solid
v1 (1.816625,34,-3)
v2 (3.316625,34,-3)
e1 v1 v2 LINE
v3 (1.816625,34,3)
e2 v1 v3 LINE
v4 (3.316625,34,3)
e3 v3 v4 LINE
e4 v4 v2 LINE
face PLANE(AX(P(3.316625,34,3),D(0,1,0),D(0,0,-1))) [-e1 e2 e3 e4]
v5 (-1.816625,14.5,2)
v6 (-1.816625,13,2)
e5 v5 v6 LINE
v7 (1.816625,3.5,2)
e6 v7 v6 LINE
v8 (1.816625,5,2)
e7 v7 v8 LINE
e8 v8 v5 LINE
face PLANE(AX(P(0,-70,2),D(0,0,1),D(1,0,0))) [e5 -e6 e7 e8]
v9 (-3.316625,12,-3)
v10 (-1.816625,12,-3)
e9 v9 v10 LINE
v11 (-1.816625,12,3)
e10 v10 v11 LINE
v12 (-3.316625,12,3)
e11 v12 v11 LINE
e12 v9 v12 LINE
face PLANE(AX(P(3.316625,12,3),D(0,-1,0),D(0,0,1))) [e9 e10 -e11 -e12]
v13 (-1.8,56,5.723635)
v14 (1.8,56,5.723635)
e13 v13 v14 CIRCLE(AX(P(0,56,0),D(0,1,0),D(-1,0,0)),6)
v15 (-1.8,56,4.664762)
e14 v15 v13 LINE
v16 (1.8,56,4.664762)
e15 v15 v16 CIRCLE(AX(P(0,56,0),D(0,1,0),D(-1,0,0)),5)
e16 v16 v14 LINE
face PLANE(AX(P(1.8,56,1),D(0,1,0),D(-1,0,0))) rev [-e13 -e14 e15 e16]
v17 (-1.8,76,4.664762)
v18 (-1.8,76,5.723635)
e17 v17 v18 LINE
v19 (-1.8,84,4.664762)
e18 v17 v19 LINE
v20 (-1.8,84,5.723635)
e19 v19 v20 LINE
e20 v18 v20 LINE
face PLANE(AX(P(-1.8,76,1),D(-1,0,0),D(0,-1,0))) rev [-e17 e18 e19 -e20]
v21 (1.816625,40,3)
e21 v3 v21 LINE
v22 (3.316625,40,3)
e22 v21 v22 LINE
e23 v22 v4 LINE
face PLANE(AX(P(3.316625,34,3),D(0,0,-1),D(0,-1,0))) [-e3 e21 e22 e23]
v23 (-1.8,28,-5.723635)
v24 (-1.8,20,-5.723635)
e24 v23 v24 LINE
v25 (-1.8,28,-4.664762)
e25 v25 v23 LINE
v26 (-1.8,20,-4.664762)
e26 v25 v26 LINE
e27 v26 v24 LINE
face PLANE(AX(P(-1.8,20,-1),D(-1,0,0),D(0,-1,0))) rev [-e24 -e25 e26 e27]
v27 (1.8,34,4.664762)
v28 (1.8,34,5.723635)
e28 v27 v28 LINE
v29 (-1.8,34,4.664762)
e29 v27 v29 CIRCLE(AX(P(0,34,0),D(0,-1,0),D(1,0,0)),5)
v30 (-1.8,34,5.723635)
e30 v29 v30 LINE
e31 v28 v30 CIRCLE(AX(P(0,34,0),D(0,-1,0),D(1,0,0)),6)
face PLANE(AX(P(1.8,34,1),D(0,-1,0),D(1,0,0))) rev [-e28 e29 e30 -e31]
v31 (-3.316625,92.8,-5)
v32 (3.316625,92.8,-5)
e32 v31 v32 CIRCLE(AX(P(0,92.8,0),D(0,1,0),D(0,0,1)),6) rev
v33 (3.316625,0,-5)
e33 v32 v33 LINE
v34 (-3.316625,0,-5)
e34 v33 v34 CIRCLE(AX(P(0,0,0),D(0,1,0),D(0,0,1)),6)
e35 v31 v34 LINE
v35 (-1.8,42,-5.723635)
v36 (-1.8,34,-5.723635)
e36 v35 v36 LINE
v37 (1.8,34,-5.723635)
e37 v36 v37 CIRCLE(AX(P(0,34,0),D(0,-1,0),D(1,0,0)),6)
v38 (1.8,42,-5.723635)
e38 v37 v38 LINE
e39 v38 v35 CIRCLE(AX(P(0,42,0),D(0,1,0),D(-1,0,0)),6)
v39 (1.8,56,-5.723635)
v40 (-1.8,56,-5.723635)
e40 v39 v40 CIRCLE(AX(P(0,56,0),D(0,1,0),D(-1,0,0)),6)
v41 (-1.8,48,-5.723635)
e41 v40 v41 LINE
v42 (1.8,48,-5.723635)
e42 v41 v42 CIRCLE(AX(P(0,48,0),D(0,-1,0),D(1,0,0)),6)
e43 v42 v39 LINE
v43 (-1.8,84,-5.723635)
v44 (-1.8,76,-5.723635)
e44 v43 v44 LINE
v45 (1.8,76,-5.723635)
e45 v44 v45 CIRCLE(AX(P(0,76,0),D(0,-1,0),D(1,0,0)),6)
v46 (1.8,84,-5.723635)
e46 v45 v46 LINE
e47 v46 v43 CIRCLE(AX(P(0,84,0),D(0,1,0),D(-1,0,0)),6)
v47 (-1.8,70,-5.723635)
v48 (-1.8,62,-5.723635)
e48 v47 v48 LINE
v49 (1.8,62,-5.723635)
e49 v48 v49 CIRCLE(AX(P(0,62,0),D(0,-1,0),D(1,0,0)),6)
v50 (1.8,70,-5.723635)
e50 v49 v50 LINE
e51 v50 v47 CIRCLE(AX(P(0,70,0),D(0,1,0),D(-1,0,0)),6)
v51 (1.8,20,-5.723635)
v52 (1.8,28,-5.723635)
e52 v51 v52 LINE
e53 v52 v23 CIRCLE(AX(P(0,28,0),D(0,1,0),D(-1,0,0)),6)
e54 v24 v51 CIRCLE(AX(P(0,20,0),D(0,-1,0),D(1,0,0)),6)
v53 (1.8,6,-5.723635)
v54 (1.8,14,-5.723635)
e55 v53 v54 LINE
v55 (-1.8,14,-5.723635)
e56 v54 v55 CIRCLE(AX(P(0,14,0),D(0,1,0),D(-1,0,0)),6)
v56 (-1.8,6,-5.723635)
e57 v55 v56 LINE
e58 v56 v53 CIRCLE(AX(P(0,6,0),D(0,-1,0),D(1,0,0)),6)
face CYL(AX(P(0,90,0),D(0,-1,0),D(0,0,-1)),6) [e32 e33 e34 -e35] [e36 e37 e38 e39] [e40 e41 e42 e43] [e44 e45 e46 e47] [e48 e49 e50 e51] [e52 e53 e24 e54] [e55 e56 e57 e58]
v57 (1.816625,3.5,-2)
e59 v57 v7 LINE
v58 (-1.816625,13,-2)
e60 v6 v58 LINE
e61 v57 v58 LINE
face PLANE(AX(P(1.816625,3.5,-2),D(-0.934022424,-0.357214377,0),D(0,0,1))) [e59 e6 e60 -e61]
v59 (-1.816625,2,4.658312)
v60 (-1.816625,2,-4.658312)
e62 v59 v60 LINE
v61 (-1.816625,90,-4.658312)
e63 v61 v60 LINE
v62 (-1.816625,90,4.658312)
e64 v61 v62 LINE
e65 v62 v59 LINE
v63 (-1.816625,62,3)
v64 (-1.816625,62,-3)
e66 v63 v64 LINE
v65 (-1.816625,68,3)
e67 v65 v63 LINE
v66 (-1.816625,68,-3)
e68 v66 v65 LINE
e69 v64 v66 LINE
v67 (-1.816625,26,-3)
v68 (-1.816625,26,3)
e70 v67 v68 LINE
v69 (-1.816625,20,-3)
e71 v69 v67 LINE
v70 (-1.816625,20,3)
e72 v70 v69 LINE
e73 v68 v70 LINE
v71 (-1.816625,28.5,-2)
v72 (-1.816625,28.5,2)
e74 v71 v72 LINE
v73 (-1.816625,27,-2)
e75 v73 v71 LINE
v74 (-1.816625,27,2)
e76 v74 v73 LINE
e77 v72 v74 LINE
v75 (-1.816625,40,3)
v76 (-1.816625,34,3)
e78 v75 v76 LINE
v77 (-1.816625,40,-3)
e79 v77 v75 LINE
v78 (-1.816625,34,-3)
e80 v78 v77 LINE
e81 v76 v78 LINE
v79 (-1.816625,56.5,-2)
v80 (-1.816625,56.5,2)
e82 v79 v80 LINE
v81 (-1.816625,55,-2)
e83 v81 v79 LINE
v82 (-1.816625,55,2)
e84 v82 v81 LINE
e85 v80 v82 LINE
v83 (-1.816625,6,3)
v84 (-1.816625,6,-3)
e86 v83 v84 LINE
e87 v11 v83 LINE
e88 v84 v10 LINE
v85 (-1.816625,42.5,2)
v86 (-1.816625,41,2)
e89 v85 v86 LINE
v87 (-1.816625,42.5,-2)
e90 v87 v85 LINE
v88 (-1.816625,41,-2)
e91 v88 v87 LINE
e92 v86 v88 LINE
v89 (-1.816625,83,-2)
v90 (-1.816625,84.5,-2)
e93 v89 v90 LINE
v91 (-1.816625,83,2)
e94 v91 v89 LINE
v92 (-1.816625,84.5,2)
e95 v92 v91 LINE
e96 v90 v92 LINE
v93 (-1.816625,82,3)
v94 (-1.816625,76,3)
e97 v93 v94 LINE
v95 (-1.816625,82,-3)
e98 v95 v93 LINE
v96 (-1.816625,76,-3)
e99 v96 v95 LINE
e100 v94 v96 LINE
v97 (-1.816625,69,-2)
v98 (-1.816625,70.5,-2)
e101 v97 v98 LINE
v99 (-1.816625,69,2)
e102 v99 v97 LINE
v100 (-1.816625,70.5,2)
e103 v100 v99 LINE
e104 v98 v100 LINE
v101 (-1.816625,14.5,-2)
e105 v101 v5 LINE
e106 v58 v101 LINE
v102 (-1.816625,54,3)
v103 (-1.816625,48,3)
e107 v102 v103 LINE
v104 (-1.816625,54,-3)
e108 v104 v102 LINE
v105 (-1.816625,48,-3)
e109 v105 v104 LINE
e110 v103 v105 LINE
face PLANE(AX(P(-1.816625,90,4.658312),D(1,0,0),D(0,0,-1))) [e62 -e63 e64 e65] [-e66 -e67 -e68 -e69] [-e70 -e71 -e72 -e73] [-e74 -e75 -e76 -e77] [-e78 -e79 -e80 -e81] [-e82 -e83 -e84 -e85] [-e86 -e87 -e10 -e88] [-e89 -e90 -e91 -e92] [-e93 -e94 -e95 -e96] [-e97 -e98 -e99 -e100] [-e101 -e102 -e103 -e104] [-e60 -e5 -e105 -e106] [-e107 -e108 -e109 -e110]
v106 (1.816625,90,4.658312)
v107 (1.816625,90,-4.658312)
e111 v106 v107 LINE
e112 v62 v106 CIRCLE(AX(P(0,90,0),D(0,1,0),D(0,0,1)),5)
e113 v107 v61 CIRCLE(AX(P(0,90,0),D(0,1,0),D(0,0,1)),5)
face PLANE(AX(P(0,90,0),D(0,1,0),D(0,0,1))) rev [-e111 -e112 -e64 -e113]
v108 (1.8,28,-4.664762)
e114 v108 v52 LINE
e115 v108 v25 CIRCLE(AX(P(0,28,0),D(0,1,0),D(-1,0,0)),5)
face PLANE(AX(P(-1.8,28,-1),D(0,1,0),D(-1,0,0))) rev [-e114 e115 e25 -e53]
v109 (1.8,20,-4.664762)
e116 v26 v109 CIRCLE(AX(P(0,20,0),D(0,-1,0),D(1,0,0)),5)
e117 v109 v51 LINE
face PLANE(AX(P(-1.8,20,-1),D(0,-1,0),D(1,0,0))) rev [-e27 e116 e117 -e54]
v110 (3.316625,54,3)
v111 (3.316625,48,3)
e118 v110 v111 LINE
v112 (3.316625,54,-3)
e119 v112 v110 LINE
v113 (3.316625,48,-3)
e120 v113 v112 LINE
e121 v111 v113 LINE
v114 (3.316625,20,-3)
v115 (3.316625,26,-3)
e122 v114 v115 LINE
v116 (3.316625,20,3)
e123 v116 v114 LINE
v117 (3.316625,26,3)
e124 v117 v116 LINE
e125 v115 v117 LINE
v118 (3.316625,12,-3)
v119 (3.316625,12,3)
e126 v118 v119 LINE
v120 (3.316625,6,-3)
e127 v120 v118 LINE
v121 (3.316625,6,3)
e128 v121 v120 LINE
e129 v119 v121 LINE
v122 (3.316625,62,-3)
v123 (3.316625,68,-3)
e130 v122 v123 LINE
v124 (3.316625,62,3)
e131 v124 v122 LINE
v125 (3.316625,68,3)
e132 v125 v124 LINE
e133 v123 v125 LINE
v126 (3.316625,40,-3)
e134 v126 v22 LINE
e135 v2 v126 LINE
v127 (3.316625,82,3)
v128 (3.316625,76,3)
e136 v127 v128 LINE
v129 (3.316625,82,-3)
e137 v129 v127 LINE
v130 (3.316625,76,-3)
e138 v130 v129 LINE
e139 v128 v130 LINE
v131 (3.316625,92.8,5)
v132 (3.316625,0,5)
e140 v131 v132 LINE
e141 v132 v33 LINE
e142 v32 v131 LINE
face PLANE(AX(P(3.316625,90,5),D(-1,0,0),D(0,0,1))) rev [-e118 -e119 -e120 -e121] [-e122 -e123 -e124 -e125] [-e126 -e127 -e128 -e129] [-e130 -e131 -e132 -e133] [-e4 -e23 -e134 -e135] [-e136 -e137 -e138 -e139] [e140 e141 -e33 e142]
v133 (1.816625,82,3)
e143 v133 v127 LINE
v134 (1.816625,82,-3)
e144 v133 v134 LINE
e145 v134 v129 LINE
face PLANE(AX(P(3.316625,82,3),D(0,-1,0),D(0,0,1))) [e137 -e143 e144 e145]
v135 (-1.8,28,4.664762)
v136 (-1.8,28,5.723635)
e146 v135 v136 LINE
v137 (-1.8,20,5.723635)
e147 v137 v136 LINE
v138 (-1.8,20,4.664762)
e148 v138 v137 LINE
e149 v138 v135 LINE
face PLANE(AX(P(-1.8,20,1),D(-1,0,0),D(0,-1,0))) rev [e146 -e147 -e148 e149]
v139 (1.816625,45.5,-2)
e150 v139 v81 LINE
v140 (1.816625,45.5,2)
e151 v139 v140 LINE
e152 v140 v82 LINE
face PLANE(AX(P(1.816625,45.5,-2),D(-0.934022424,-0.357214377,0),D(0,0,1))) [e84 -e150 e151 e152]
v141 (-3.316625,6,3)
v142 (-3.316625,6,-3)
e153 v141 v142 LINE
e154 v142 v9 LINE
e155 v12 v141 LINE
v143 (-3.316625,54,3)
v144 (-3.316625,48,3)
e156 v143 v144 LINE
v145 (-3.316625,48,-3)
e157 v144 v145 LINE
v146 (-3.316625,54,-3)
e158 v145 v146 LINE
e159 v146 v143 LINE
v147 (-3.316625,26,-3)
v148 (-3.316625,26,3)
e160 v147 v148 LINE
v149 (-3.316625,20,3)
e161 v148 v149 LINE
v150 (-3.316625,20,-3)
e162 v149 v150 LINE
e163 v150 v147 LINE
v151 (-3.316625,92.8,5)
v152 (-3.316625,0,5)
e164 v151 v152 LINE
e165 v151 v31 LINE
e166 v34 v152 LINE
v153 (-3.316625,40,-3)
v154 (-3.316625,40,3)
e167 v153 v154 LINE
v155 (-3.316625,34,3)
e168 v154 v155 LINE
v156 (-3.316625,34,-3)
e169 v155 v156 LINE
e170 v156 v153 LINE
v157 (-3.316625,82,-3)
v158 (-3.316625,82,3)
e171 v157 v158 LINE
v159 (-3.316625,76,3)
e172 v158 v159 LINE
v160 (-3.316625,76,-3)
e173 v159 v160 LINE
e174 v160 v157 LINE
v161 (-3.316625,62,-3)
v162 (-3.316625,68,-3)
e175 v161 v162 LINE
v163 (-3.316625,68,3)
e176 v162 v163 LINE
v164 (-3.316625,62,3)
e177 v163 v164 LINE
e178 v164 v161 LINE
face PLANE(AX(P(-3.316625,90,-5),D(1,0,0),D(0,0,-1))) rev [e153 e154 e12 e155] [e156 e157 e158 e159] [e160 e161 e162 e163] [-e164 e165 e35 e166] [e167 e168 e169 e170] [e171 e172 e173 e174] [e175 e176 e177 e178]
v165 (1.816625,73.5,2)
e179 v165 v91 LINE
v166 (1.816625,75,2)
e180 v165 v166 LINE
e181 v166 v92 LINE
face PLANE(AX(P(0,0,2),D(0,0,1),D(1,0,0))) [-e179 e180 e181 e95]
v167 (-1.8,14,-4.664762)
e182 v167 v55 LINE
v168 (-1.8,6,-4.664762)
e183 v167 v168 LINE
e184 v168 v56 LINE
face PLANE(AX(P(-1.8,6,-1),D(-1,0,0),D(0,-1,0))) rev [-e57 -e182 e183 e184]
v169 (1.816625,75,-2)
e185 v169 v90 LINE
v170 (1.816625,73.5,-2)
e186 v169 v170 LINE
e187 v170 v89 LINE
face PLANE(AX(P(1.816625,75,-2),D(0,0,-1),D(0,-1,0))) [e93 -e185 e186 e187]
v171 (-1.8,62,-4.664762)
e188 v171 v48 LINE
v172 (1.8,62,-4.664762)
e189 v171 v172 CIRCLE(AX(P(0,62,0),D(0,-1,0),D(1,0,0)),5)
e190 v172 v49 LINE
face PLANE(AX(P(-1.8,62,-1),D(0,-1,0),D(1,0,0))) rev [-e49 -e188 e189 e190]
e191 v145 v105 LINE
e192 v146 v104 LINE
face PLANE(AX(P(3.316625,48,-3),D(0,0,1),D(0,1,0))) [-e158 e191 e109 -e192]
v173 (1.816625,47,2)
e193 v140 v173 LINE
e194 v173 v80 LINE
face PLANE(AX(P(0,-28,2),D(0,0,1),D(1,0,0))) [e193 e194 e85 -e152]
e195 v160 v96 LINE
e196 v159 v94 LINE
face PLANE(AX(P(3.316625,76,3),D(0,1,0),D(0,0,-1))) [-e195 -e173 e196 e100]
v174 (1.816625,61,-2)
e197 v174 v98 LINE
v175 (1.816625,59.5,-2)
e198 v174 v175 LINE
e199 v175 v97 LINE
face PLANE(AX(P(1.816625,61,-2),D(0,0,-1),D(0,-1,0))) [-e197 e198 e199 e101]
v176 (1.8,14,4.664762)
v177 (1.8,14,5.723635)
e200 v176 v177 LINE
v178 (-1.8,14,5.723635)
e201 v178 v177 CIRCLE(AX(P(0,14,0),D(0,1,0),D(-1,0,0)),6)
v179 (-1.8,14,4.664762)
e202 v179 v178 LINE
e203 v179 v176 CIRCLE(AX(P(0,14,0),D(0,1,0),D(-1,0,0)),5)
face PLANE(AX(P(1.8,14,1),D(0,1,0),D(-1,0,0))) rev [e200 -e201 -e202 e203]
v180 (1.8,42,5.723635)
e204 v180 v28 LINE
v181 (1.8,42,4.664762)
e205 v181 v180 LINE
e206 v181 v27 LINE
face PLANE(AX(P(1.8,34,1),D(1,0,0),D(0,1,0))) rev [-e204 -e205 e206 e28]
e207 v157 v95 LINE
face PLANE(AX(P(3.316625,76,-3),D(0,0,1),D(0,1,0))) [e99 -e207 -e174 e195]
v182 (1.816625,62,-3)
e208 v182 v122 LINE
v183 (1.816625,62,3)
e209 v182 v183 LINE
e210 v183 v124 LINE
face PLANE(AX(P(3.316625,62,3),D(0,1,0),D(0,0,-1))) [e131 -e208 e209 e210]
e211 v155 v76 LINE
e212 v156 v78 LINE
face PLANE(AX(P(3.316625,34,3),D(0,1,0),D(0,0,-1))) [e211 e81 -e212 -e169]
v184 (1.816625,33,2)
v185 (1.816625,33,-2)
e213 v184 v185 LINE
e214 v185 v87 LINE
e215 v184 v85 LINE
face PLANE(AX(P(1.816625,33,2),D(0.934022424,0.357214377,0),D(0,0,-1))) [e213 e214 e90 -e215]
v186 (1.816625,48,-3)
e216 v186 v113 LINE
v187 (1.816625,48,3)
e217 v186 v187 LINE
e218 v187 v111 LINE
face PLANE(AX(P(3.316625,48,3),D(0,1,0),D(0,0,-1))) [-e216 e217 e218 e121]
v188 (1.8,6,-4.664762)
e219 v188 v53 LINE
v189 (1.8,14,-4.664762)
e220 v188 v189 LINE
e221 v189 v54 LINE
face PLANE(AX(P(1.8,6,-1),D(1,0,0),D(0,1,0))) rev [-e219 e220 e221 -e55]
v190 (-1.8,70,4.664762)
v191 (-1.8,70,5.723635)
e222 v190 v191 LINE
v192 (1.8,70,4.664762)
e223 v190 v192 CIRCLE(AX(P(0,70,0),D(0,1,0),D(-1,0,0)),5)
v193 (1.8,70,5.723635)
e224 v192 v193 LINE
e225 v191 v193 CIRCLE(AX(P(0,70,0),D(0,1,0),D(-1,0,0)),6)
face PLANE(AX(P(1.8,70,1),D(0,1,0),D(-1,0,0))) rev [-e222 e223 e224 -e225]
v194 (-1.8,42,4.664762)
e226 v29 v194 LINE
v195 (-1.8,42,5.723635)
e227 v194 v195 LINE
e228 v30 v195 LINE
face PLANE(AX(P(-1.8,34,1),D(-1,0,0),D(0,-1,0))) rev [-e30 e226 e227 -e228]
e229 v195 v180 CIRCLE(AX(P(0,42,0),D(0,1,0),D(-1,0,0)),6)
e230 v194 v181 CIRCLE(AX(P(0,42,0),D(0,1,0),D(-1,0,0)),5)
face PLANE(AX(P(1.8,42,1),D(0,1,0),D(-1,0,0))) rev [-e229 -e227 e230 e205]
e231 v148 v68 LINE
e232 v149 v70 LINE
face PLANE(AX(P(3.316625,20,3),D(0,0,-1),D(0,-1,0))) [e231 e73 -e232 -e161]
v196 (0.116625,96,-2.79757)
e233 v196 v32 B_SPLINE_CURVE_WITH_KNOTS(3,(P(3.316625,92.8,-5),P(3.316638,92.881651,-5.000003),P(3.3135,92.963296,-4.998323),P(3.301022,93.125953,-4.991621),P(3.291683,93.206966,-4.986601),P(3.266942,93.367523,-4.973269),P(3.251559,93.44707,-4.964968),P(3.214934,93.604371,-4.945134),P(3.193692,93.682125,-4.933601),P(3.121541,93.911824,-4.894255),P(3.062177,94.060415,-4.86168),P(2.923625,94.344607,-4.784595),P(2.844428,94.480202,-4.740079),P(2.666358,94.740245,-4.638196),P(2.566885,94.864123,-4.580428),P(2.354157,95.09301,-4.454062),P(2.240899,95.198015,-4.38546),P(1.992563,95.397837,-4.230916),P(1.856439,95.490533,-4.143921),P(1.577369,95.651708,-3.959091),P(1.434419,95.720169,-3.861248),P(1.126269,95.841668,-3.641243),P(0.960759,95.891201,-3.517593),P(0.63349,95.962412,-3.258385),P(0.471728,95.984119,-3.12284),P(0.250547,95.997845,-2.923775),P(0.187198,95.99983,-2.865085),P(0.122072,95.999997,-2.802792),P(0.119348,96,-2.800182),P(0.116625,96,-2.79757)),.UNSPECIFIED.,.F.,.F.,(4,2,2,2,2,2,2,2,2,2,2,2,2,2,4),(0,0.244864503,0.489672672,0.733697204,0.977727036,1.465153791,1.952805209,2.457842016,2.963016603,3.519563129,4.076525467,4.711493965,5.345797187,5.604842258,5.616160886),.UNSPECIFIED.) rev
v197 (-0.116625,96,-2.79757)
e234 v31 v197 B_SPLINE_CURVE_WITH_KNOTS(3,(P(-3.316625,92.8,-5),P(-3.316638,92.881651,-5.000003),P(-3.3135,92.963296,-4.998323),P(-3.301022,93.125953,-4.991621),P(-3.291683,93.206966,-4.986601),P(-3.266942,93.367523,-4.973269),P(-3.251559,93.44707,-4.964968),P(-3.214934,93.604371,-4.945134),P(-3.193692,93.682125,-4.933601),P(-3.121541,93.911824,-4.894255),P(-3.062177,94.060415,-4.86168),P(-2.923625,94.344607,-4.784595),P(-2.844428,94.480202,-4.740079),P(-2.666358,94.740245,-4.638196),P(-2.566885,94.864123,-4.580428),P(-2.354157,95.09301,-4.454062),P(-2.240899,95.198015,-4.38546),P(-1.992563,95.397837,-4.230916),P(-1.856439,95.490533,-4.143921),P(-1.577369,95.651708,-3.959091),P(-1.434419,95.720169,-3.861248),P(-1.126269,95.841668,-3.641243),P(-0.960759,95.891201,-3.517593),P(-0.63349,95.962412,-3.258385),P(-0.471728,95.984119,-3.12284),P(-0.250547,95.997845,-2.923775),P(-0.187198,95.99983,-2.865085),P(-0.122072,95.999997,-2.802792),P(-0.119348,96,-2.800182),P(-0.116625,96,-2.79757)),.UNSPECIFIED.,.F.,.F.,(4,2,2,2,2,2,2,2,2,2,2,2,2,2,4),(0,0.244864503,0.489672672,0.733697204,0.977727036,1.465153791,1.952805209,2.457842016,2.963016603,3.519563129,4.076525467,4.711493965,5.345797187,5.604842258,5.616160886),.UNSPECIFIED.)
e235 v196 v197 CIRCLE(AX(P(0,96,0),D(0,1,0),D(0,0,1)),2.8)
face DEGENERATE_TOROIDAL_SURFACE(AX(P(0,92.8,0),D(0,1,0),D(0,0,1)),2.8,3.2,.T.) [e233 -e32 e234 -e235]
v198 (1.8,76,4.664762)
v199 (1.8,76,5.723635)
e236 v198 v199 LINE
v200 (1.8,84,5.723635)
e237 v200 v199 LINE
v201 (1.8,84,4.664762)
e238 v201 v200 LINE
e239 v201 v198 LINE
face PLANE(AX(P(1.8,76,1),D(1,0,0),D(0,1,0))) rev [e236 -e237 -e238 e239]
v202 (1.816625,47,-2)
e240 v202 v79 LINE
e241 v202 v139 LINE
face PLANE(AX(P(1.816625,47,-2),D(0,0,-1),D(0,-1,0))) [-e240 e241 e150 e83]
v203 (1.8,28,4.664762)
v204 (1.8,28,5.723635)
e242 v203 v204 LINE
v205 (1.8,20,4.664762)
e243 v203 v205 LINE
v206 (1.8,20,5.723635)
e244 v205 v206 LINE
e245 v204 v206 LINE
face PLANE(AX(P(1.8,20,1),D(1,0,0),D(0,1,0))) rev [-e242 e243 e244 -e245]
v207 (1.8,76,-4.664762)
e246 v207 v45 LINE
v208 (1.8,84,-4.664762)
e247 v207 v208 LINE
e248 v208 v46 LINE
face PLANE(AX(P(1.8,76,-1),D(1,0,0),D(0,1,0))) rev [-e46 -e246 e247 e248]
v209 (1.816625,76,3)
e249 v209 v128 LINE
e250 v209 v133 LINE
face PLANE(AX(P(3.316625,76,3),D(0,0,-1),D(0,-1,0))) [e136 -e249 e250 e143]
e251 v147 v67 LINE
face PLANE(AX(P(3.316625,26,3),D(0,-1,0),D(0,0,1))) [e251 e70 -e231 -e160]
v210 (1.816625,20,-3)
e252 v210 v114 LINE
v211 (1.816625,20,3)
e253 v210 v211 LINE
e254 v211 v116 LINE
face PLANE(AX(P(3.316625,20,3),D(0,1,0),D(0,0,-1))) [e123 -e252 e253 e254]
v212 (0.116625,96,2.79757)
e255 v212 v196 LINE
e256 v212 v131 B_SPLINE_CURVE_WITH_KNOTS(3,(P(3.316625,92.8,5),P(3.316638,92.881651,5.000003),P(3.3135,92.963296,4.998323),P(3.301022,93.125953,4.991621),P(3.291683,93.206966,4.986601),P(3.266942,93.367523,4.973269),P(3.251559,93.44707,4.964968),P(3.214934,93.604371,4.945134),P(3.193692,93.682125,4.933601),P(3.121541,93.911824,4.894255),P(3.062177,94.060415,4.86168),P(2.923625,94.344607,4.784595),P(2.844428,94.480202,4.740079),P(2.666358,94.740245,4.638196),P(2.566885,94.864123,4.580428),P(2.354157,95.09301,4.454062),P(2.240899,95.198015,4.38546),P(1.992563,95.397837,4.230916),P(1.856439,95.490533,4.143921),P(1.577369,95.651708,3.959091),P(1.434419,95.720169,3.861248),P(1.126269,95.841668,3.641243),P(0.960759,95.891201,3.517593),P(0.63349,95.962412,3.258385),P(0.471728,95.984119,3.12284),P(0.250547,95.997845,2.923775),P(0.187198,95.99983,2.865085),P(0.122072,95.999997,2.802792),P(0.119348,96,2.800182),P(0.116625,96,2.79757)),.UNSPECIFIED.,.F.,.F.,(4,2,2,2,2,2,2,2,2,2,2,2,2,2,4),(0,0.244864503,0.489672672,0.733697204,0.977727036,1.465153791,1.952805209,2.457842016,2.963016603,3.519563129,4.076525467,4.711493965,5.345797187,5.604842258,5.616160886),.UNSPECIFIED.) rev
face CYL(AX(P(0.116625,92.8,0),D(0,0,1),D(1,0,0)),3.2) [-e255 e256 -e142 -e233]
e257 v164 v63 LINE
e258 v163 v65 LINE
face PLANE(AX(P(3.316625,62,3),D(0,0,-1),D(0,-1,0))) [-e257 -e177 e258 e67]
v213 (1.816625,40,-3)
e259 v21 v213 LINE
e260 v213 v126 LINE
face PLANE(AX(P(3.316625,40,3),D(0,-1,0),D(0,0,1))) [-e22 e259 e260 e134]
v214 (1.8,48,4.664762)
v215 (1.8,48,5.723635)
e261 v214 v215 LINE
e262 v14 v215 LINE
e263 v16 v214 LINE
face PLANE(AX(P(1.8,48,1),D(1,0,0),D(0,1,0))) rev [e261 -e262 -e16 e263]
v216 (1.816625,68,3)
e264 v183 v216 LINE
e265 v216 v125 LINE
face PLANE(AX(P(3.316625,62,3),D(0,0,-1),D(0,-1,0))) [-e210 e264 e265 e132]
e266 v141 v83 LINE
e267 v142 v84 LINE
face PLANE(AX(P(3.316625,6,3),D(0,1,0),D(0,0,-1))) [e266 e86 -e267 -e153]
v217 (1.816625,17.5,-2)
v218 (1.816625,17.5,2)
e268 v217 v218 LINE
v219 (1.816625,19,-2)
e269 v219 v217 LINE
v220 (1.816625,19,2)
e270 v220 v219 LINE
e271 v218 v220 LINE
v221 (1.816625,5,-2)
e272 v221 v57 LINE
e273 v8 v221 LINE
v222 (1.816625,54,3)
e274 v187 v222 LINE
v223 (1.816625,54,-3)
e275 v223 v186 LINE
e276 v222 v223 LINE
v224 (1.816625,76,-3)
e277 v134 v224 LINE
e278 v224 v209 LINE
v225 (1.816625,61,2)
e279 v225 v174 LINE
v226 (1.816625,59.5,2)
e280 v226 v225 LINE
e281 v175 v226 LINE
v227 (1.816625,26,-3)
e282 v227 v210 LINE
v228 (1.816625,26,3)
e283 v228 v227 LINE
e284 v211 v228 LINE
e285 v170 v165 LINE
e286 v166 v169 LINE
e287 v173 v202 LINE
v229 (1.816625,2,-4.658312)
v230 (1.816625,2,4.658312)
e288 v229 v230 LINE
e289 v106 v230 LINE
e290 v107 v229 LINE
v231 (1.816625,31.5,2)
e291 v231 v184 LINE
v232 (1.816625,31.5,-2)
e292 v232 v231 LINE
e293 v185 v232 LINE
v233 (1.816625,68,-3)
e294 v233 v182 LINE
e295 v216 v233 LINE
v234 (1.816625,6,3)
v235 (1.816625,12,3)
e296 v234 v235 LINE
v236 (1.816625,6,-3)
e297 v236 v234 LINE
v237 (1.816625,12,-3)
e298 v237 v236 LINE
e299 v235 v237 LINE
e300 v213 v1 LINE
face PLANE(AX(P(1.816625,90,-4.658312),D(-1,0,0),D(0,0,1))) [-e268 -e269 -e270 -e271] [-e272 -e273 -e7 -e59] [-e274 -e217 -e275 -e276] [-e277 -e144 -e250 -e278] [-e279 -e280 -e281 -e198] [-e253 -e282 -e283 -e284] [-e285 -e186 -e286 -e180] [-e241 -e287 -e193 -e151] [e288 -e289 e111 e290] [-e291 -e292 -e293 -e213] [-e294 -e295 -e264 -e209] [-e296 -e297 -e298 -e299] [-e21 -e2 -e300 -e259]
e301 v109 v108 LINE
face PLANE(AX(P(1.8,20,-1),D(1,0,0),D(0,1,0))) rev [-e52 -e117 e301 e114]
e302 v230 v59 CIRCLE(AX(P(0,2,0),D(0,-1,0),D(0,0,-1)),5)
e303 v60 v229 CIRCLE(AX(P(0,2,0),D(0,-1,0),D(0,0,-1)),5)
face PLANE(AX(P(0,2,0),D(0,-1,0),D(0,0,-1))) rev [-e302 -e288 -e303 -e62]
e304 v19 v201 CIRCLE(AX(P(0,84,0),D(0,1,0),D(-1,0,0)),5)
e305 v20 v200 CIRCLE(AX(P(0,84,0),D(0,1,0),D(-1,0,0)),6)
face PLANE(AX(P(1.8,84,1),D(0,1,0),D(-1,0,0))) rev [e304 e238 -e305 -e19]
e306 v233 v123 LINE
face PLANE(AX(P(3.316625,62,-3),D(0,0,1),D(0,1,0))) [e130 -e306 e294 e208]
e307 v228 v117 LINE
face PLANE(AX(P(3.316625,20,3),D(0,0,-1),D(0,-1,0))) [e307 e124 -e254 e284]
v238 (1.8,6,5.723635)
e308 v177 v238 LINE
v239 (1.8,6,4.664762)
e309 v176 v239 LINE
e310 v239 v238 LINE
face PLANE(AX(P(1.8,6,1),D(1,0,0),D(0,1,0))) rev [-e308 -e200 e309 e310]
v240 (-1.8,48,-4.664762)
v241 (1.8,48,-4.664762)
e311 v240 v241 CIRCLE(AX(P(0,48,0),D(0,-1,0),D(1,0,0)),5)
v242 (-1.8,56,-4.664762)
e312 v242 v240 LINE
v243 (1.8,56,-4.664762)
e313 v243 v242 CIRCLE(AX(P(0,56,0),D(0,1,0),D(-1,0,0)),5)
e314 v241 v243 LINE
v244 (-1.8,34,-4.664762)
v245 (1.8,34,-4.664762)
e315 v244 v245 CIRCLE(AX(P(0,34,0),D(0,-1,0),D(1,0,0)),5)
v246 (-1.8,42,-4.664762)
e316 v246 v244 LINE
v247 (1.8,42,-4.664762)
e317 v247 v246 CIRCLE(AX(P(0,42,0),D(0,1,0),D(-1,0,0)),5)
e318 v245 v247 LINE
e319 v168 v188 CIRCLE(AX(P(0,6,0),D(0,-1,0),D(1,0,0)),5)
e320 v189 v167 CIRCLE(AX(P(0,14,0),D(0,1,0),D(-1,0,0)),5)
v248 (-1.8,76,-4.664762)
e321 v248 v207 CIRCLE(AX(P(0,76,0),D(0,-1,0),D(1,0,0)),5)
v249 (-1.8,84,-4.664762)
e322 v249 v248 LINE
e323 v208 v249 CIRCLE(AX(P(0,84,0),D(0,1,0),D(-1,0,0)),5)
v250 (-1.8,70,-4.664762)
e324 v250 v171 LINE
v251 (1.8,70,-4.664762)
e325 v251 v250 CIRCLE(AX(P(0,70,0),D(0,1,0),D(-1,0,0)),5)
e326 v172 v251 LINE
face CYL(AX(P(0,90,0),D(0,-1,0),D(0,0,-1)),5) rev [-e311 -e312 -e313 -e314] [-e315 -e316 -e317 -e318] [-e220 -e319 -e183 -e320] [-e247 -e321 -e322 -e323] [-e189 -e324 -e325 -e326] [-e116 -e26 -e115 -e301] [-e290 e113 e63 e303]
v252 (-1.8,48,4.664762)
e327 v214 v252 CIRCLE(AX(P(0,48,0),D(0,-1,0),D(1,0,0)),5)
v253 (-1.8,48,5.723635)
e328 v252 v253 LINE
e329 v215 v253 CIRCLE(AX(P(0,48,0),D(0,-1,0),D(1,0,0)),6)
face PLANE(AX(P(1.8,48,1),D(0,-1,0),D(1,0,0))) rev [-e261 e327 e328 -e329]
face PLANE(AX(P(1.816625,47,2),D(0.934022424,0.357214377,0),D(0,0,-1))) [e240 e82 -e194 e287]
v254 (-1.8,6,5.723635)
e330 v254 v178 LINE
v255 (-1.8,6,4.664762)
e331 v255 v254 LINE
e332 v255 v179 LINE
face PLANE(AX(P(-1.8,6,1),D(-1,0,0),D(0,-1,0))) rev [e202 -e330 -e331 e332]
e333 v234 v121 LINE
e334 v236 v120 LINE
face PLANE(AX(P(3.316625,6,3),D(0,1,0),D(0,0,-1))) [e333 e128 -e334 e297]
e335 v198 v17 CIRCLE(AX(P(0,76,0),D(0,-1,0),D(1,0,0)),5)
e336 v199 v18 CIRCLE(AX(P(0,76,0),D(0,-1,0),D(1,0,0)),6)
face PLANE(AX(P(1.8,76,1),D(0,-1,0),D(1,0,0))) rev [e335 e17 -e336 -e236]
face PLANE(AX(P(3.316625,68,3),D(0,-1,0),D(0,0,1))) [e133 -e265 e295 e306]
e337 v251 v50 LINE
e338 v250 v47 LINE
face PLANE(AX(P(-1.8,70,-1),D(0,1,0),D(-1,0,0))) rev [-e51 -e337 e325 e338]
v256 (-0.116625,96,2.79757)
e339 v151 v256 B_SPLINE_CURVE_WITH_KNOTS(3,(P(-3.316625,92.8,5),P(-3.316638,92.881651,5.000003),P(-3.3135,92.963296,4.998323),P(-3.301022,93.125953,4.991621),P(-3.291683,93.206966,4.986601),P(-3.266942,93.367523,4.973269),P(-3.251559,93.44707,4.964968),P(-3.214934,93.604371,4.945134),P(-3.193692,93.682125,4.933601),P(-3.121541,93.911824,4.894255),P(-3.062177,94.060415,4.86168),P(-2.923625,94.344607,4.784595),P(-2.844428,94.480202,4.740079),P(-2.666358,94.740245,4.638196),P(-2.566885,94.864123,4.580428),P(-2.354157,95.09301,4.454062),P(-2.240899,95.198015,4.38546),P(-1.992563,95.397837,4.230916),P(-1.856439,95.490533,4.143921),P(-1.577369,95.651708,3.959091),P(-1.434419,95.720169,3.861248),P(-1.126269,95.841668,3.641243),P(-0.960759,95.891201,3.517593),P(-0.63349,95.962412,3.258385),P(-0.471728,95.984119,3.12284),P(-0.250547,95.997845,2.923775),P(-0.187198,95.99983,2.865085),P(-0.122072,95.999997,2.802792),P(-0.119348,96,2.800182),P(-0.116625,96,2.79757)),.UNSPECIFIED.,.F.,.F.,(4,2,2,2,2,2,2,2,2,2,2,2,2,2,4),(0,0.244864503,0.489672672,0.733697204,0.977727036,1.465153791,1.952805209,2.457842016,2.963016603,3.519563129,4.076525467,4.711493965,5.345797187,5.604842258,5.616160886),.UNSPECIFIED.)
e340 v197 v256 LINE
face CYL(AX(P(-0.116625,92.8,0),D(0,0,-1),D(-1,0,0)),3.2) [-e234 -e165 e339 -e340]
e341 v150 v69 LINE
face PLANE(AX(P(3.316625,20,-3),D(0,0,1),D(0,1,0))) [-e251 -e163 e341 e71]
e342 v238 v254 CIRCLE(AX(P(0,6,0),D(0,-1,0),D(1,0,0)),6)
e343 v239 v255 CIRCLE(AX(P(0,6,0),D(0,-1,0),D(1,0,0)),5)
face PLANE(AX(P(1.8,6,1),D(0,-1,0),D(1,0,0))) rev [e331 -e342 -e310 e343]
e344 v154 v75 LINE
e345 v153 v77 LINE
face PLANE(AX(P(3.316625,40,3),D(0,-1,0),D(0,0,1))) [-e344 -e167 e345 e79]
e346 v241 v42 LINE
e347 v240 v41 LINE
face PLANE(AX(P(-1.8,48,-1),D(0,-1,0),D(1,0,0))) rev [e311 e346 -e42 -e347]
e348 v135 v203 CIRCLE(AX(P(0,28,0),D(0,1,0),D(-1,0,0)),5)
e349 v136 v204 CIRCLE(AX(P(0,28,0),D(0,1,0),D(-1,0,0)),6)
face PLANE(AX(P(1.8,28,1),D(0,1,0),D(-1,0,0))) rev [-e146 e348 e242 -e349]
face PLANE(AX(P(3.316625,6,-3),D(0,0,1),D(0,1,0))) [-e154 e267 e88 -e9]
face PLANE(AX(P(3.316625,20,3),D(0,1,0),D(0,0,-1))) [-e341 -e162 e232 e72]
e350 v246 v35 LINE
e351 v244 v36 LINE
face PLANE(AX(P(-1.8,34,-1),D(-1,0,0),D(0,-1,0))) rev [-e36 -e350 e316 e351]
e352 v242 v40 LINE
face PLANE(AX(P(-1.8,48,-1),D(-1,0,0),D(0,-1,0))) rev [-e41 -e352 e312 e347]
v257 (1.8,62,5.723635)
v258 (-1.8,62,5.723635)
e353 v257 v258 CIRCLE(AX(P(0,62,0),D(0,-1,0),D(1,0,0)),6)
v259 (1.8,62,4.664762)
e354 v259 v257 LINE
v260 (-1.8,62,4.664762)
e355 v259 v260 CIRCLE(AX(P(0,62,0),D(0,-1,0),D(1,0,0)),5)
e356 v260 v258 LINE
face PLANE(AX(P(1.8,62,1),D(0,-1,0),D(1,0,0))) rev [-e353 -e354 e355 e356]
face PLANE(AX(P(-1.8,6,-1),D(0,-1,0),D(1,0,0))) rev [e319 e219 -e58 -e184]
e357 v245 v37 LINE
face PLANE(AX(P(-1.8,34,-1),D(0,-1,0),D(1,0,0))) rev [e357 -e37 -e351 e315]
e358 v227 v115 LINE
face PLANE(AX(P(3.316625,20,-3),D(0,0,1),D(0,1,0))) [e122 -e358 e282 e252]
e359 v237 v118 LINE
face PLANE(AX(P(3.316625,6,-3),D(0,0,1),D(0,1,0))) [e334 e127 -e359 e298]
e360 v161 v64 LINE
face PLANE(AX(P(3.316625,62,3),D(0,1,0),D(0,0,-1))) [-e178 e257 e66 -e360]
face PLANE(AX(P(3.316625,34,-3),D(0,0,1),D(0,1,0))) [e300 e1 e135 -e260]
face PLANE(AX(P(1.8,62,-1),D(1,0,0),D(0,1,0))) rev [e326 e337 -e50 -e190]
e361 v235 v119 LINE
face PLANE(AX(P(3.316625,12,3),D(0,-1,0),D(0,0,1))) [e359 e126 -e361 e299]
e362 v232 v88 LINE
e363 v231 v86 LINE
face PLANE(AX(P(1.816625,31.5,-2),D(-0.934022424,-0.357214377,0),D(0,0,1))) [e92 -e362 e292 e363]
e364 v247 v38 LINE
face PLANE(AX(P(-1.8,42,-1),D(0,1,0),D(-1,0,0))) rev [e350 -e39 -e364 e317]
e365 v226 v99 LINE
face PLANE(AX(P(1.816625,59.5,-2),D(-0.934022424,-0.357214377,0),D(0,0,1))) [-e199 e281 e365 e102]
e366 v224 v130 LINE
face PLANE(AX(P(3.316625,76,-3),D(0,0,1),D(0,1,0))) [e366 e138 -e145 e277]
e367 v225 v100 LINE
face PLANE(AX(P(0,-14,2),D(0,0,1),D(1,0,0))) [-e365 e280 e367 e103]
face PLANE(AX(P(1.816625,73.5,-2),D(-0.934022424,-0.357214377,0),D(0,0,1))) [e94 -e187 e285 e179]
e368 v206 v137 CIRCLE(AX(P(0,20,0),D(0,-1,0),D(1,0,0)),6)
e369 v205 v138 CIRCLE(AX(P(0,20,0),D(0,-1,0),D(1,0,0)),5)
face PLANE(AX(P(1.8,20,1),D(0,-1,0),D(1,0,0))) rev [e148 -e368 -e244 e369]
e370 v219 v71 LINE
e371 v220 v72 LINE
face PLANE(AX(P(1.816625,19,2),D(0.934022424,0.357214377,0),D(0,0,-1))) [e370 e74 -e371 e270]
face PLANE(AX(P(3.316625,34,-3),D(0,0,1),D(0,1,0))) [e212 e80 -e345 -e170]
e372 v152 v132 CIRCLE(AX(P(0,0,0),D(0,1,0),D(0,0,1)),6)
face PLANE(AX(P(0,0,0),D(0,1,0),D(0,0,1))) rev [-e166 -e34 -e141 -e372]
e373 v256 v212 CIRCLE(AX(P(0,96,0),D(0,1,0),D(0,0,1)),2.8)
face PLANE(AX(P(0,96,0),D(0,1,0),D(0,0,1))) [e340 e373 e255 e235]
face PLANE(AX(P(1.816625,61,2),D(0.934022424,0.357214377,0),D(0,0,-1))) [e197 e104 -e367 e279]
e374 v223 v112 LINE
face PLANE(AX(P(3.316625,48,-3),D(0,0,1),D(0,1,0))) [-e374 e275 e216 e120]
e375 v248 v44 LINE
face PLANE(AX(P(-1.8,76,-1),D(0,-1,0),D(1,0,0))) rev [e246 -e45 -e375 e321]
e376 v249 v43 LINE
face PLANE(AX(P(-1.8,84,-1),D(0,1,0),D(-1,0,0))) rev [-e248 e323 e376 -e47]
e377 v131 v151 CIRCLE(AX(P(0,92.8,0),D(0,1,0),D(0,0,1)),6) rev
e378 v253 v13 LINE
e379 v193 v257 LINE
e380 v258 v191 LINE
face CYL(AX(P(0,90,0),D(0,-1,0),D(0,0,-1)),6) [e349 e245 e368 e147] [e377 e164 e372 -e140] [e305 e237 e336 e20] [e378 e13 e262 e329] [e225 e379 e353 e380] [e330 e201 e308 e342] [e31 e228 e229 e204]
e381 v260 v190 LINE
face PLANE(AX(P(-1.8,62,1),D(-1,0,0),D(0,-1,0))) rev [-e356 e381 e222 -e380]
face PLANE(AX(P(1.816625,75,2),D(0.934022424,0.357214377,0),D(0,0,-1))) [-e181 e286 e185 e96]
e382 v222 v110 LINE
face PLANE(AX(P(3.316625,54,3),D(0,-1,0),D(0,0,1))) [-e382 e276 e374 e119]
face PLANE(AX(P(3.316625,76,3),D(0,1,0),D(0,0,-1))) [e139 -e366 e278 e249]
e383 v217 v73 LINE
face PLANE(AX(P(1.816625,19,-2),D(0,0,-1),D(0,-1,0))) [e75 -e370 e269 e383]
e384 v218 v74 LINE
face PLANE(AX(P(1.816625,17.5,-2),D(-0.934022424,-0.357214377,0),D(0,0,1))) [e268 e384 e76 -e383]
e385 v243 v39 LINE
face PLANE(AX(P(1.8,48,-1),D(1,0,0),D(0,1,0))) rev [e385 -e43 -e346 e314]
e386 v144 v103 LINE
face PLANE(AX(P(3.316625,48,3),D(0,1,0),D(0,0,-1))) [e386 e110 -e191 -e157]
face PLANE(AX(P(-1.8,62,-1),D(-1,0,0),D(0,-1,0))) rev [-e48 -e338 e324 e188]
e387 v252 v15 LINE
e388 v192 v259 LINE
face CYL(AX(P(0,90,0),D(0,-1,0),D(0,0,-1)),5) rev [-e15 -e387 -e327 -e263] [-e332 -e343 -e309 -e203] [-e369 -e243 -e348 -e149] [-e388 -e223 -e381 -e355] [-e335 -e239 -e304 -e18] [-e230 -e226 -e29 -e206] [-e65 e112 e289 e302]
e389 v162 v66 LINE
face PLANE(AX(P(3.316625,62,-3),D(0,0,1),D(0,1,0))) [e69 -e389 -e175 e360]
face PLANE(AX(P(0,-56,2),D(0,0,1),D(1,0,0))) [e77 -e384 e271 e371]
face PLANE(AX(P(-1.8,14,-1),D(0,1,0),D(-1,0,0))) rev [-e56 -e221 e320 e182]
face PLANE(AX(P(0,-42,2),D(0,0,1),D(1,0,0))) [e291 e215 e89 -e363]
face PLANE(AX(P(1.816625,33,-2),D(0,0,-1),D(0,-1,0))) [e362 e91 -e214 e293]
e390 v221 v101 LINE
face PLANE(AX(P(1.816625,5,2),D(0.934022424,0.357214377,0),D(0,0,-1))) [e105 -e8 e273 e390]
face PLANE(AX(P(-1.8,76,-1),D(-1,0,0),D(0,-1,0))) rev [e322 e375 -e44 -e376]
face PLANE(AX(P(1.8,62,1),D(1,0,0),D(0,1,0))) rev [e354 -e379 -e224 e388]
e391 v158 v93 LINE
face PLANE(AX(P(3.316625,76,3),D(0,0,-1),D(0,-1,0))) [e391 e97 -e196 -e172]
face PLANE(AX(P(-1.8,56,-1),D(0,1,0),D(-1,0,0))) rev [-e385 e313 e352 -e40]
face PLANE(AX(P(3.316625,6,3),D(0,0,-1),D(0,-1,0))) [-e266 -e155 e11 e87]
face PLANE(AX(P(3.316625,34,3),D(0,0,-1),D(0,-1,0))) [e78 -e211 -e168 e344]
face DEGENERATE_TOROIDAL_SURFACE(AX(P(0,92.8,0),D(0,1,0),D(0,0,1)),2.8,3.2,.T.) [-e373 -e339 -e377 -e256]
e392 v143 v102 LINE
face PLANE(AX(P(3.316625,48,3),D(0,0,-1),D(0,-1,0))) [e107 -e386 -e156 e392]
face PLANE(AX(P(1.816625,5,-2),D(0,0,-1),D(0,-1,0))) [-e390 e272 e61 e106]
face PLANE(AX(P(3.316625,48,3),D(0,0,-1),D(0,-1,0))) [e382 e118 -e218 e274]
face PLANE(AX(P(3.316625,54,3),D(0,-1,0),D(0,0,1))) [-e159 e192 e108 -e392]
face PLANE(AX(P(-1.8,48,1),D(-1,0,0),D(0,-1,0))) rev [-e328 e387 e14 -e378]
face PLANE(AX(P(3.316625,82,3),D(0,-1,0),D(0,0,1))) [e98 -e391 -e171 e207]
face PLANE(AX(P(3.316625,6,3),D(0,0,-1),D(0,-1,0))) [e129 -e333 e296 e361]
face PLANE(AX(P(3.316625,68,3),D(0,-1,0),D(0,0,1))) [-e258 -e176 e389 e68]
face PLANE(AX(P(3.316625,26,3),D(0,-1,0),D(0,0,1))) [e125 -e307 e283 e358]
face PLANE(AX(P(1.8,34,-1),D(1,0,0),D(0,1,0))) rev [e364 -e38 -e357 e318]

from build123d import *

# Parameters (mm, degrees)
BOSS_EXTRUDE1_DEPTH = 90
WRAP1_START         = -6.633249581
WRAP1_OUTLINE_W     = 6
WRAP1_OUTLINE_H     = 6
WRAP1_DEPTH         = 6.633249581
SKETCH4_W           = 3.6
SKETCH4_H           = 8
CUT_EXTRUDE1_DEPTH  = 5
CIRPATTERN3_COUNT   = 2
BOSS_EXTRUDE2_DEPTH = 2
LPATTERN1_COUNT     = 6
LPATTERN1_PITCH     = 14
BOSS_EXTRUDE3_DEPTH = 6
FILLET4_R           = 3.2


# Read off the part's stored shape, not the designer's step: Wrap1
with BuildPart() as part:
    # Sketch1 → Boss-Extrude1 (new body)
    with BuildSketch(Plane(origin=(0, 0, 0), x_dir=(1, 0, 0), z_dir=(0, 1, 0))):
        with BuildLine():
            Line((-3.31662479, 5), (-3.31662479, -5))
            ThreePointArc((-3.31662479, -5), (0, -6), (3.31662479, -5))
            Line((3.31662479, -5), (3.31662479, 5))
            ThreePointArc((3.31662479, 5), (0, 6), (-3.31662479, 5))
        make_face()
        with BuildLine():
            Line((-1.81662479, -4.658312395), (-1.81662479, 4.658312395))
            ThreePointArc((-1.81662479, 4.658312395), (0, 5), (1.81662479, 4.658312395))
            Line((1.81662479, 4.658312395), (1.81662479, -4.658312395))
            ThreePointArc((1.81662479, -4.658312395), (0, -5), (-1.81662479, -4.658312395))
        make_face(mode=Mode.SUBTRACT)
    extrude(amount=BOSS_EXTRUDE1_DEPTH)

    # Wrap1 outline → Wrap1 (cut)
    with BuildSketch(Plane(origin=(3.31662479, 0, 0), x_dir=(0, 0, -1), z_dir=(1, 0, 0)).offset(WRAP1_START)):
        with Locations((0, 79)):
            Rectangle(WRAP1_OUTLINE_W, WRAP1_OUTLINE_H)
        with Locations((0, 65)):
            Rectangle(WRAP1_OUTLINE_W, WRAP1_OUTLINE_H)
        with Locations((0, 51)):
            Rectangle(WRAP1_OUTLINE_W, WRAP1_OUTLINE_H)
        with Locations((0, 37)):
            Rectangle(WRAP1_OUTLINE_W, WRAP1_OUTLINE_H)
        with Locations((0, 23)):
            Rectangle(WRAP1_OUTLINE_W, WRAP1_OUTLINE_H)
        with Locations((0, 9)):
            Rectangle(WRAP1_OUTLINE_W, WRAP1_OUTLINE_H)
    extrude(amount=WRAP1_DEPTH, mode=Mode.SUBTRACT)

    # Sketch4 → Cut-Extrude1 (cut)
    with BuildSketch(Plane.XY.offset(6)):
        with Locations((0, 10)):
            Rectangle(SKETCH4_W, SKETCH4_H)
        with Locations((0, 24)):
            Rectangle(SKETCH4_W, SKETCH4_H)
        with Locations((0, 38)):
            Rectangle(SKETCH4_W, SKETCH4_H)
        with Locations((0, 52)):
            Rectangle(SKETCH4_W, SKETCH4_H)
        with Locations((0, 66)):
            Rectangle(SKETCH4_W, SKETCH4_H)
        with Locations((0, 80)):
            Rectangle(SKETCH4_W, SKETCH4_H)
    cut_extrude1 = extrude(amount=-CUT_EXTRUDE1_DEPTH, mode=Mode.SUBTRACT)

    # CirPattern3: Cut-Extrude1 ×2 about axis
    cirpattern3_axis = Axis((0, 90, 0), (0, -1, 0))
    for i in range(1, CIRPATTERN3_COUNT):
        add(cut_extrude1.rotate(cirpattern3_axis, i * 360 / CIRPATTERN3_COUNT), mode=Mode.SUBTRACT)

    # Sketch5 → Boss-Extrude2 (add)
    with BuildSketch(Plane.XZ):
        with BuildLine():
            Line((1.81662479, 4.658312395), (1.81662479, -4.658312395))
            ThreePointArc((1.81662479, -4.658312395), (0, -5), (-1.81662479, -4.658312395))
            Line((-1.81662479, -4.658312395), (-1.81662479, 4.658312395))
            ThreePointArc((-1.81662479, 4.658312395), (0, 5), (1.81662479, 4.658312395))
        make_face()
    extrude(amount=-BOSS_EXTRUDE2_DEPTH)

    # Sketch8 → Loft1 section 0
    with BuildSketch(Plane.ZY.offset(-1.81662479)):
        with BuildLine():
            Line((-2, 75), (2, 75))
            Line((2, 75), (2, 73.5))
            Line((2, 73.5), (-2, 73.5))
            Line((-2, 73.5), (-2, 75))
        make_face()
    # Sketch6 → Loft1 section 1
    with BuildSketch(Plane(origin=(-1.81662479, 0, 0), x_dir=(0, 0, -1), z_dir=(1, 0, 0))):
        with BuildLine():
            Line((-2, 84.5), (2, 84.5))
            Line((2, 84.5), (2, 83))
            Line((2, 83), (-2, 83))
            Line((-2, 83), (-2, 84.5))
        make_face()
    loft1 = loft()

    # LPattern1: Loft1 ×6
    with Locations(*[(0, -i * LPATTERN1_PITCH, 0) for i in range(1, LPATTERN1_COUNT)]):
        add(loft1)

    # Sketch10 → Boss-Extrude3 (add)
    with BuildSketch(Plane(origin=(0, 90, 0), x_dir=(1, 0, 0), z_dir=(0, 1, 0))):
        with BuildLine():
            Line((-3.31662479, 5), (-3.31662479, -5))
            ThreePointArc((-3.31662479, -5), (0, -6), (3.31662479, -5))
            Line((3.31662479, -5), (3.31662479, 5))
            ThreePointArc((3.31662479, 5), (0, 6), (-3.31662479, 5))
        make_face()
    extrude(amount=BOSS_EXTRUDE3_DEPTH)

    # Fillet4
    # the kernel refuses this fillet: 3.2 mm, written as the material it takes off along each edge
    with BuildSketch(Plane(origin=(0, 96, 0), x_dir=(0.9398790484692316, 0, 0.34150750247772244), z_dir=(-0.34150750247772244, 0, 0.9398790484692316))) as fillet4_piece_1:
        with BuildLine():
            CenterArc((6 - FILLET4_R, -FILLET4_R), FILLET4_R, 0, 90)
            Line((6, -FILLET4_R), (6, 0))
            Line((6, 0), (6 - FILLET4_R, 0))
        make_face()
    revolve(axis=Axis((0, 96, 0), (0, 1, 0)), revolution_arc=219.937491809, mode=Mode.SUBTRACT)
    with BuildSketch(Plane(origin=(-3.31662479, 96, -13), x_dir=(0, -1, 0), z_dir=(0, 0, 1)), Plane(origin=(3.31662479, 96, 13), x_dir=(0, -1, 0), z_dir=(0, 0, -1))) as fillet4_piece_2:
        with BuildLine():
            CenterArc((FILLET4_R, FILLET4_R), FILLET4_R, 180, 90)
            Line((0, FILLET4_R), (0, 0))
            Line((0, 0), (FILLET4_R, 0))
        make_face()
    extrude(amount=26, mode=Mode.SUBTRACT)
    with BuildSketch(Plane(origin=(0, 96, 0), x_dir=(-0.9398790484692316, 0, -0.34150750247772244), z_dir=(0.34150750247772244, 0, -0.9398790484692316))) as fillet4_piece_3:
        with BuildLine():
            CenterArc((6 - FILLET4_R, -FILLET4_R), FILLET4_R, 0, 90)
            Line((6 - FILLET4_R, 0), (6, 0))
            Line((6, 0), (6, -FILLET4_R))
        make_face()
    revolve(axis=Axis((0, 96, 0), (0, 1, 0)), revolution_arc=219.937491809, mode=Mode.SUBTRACT)


solid = part.part
